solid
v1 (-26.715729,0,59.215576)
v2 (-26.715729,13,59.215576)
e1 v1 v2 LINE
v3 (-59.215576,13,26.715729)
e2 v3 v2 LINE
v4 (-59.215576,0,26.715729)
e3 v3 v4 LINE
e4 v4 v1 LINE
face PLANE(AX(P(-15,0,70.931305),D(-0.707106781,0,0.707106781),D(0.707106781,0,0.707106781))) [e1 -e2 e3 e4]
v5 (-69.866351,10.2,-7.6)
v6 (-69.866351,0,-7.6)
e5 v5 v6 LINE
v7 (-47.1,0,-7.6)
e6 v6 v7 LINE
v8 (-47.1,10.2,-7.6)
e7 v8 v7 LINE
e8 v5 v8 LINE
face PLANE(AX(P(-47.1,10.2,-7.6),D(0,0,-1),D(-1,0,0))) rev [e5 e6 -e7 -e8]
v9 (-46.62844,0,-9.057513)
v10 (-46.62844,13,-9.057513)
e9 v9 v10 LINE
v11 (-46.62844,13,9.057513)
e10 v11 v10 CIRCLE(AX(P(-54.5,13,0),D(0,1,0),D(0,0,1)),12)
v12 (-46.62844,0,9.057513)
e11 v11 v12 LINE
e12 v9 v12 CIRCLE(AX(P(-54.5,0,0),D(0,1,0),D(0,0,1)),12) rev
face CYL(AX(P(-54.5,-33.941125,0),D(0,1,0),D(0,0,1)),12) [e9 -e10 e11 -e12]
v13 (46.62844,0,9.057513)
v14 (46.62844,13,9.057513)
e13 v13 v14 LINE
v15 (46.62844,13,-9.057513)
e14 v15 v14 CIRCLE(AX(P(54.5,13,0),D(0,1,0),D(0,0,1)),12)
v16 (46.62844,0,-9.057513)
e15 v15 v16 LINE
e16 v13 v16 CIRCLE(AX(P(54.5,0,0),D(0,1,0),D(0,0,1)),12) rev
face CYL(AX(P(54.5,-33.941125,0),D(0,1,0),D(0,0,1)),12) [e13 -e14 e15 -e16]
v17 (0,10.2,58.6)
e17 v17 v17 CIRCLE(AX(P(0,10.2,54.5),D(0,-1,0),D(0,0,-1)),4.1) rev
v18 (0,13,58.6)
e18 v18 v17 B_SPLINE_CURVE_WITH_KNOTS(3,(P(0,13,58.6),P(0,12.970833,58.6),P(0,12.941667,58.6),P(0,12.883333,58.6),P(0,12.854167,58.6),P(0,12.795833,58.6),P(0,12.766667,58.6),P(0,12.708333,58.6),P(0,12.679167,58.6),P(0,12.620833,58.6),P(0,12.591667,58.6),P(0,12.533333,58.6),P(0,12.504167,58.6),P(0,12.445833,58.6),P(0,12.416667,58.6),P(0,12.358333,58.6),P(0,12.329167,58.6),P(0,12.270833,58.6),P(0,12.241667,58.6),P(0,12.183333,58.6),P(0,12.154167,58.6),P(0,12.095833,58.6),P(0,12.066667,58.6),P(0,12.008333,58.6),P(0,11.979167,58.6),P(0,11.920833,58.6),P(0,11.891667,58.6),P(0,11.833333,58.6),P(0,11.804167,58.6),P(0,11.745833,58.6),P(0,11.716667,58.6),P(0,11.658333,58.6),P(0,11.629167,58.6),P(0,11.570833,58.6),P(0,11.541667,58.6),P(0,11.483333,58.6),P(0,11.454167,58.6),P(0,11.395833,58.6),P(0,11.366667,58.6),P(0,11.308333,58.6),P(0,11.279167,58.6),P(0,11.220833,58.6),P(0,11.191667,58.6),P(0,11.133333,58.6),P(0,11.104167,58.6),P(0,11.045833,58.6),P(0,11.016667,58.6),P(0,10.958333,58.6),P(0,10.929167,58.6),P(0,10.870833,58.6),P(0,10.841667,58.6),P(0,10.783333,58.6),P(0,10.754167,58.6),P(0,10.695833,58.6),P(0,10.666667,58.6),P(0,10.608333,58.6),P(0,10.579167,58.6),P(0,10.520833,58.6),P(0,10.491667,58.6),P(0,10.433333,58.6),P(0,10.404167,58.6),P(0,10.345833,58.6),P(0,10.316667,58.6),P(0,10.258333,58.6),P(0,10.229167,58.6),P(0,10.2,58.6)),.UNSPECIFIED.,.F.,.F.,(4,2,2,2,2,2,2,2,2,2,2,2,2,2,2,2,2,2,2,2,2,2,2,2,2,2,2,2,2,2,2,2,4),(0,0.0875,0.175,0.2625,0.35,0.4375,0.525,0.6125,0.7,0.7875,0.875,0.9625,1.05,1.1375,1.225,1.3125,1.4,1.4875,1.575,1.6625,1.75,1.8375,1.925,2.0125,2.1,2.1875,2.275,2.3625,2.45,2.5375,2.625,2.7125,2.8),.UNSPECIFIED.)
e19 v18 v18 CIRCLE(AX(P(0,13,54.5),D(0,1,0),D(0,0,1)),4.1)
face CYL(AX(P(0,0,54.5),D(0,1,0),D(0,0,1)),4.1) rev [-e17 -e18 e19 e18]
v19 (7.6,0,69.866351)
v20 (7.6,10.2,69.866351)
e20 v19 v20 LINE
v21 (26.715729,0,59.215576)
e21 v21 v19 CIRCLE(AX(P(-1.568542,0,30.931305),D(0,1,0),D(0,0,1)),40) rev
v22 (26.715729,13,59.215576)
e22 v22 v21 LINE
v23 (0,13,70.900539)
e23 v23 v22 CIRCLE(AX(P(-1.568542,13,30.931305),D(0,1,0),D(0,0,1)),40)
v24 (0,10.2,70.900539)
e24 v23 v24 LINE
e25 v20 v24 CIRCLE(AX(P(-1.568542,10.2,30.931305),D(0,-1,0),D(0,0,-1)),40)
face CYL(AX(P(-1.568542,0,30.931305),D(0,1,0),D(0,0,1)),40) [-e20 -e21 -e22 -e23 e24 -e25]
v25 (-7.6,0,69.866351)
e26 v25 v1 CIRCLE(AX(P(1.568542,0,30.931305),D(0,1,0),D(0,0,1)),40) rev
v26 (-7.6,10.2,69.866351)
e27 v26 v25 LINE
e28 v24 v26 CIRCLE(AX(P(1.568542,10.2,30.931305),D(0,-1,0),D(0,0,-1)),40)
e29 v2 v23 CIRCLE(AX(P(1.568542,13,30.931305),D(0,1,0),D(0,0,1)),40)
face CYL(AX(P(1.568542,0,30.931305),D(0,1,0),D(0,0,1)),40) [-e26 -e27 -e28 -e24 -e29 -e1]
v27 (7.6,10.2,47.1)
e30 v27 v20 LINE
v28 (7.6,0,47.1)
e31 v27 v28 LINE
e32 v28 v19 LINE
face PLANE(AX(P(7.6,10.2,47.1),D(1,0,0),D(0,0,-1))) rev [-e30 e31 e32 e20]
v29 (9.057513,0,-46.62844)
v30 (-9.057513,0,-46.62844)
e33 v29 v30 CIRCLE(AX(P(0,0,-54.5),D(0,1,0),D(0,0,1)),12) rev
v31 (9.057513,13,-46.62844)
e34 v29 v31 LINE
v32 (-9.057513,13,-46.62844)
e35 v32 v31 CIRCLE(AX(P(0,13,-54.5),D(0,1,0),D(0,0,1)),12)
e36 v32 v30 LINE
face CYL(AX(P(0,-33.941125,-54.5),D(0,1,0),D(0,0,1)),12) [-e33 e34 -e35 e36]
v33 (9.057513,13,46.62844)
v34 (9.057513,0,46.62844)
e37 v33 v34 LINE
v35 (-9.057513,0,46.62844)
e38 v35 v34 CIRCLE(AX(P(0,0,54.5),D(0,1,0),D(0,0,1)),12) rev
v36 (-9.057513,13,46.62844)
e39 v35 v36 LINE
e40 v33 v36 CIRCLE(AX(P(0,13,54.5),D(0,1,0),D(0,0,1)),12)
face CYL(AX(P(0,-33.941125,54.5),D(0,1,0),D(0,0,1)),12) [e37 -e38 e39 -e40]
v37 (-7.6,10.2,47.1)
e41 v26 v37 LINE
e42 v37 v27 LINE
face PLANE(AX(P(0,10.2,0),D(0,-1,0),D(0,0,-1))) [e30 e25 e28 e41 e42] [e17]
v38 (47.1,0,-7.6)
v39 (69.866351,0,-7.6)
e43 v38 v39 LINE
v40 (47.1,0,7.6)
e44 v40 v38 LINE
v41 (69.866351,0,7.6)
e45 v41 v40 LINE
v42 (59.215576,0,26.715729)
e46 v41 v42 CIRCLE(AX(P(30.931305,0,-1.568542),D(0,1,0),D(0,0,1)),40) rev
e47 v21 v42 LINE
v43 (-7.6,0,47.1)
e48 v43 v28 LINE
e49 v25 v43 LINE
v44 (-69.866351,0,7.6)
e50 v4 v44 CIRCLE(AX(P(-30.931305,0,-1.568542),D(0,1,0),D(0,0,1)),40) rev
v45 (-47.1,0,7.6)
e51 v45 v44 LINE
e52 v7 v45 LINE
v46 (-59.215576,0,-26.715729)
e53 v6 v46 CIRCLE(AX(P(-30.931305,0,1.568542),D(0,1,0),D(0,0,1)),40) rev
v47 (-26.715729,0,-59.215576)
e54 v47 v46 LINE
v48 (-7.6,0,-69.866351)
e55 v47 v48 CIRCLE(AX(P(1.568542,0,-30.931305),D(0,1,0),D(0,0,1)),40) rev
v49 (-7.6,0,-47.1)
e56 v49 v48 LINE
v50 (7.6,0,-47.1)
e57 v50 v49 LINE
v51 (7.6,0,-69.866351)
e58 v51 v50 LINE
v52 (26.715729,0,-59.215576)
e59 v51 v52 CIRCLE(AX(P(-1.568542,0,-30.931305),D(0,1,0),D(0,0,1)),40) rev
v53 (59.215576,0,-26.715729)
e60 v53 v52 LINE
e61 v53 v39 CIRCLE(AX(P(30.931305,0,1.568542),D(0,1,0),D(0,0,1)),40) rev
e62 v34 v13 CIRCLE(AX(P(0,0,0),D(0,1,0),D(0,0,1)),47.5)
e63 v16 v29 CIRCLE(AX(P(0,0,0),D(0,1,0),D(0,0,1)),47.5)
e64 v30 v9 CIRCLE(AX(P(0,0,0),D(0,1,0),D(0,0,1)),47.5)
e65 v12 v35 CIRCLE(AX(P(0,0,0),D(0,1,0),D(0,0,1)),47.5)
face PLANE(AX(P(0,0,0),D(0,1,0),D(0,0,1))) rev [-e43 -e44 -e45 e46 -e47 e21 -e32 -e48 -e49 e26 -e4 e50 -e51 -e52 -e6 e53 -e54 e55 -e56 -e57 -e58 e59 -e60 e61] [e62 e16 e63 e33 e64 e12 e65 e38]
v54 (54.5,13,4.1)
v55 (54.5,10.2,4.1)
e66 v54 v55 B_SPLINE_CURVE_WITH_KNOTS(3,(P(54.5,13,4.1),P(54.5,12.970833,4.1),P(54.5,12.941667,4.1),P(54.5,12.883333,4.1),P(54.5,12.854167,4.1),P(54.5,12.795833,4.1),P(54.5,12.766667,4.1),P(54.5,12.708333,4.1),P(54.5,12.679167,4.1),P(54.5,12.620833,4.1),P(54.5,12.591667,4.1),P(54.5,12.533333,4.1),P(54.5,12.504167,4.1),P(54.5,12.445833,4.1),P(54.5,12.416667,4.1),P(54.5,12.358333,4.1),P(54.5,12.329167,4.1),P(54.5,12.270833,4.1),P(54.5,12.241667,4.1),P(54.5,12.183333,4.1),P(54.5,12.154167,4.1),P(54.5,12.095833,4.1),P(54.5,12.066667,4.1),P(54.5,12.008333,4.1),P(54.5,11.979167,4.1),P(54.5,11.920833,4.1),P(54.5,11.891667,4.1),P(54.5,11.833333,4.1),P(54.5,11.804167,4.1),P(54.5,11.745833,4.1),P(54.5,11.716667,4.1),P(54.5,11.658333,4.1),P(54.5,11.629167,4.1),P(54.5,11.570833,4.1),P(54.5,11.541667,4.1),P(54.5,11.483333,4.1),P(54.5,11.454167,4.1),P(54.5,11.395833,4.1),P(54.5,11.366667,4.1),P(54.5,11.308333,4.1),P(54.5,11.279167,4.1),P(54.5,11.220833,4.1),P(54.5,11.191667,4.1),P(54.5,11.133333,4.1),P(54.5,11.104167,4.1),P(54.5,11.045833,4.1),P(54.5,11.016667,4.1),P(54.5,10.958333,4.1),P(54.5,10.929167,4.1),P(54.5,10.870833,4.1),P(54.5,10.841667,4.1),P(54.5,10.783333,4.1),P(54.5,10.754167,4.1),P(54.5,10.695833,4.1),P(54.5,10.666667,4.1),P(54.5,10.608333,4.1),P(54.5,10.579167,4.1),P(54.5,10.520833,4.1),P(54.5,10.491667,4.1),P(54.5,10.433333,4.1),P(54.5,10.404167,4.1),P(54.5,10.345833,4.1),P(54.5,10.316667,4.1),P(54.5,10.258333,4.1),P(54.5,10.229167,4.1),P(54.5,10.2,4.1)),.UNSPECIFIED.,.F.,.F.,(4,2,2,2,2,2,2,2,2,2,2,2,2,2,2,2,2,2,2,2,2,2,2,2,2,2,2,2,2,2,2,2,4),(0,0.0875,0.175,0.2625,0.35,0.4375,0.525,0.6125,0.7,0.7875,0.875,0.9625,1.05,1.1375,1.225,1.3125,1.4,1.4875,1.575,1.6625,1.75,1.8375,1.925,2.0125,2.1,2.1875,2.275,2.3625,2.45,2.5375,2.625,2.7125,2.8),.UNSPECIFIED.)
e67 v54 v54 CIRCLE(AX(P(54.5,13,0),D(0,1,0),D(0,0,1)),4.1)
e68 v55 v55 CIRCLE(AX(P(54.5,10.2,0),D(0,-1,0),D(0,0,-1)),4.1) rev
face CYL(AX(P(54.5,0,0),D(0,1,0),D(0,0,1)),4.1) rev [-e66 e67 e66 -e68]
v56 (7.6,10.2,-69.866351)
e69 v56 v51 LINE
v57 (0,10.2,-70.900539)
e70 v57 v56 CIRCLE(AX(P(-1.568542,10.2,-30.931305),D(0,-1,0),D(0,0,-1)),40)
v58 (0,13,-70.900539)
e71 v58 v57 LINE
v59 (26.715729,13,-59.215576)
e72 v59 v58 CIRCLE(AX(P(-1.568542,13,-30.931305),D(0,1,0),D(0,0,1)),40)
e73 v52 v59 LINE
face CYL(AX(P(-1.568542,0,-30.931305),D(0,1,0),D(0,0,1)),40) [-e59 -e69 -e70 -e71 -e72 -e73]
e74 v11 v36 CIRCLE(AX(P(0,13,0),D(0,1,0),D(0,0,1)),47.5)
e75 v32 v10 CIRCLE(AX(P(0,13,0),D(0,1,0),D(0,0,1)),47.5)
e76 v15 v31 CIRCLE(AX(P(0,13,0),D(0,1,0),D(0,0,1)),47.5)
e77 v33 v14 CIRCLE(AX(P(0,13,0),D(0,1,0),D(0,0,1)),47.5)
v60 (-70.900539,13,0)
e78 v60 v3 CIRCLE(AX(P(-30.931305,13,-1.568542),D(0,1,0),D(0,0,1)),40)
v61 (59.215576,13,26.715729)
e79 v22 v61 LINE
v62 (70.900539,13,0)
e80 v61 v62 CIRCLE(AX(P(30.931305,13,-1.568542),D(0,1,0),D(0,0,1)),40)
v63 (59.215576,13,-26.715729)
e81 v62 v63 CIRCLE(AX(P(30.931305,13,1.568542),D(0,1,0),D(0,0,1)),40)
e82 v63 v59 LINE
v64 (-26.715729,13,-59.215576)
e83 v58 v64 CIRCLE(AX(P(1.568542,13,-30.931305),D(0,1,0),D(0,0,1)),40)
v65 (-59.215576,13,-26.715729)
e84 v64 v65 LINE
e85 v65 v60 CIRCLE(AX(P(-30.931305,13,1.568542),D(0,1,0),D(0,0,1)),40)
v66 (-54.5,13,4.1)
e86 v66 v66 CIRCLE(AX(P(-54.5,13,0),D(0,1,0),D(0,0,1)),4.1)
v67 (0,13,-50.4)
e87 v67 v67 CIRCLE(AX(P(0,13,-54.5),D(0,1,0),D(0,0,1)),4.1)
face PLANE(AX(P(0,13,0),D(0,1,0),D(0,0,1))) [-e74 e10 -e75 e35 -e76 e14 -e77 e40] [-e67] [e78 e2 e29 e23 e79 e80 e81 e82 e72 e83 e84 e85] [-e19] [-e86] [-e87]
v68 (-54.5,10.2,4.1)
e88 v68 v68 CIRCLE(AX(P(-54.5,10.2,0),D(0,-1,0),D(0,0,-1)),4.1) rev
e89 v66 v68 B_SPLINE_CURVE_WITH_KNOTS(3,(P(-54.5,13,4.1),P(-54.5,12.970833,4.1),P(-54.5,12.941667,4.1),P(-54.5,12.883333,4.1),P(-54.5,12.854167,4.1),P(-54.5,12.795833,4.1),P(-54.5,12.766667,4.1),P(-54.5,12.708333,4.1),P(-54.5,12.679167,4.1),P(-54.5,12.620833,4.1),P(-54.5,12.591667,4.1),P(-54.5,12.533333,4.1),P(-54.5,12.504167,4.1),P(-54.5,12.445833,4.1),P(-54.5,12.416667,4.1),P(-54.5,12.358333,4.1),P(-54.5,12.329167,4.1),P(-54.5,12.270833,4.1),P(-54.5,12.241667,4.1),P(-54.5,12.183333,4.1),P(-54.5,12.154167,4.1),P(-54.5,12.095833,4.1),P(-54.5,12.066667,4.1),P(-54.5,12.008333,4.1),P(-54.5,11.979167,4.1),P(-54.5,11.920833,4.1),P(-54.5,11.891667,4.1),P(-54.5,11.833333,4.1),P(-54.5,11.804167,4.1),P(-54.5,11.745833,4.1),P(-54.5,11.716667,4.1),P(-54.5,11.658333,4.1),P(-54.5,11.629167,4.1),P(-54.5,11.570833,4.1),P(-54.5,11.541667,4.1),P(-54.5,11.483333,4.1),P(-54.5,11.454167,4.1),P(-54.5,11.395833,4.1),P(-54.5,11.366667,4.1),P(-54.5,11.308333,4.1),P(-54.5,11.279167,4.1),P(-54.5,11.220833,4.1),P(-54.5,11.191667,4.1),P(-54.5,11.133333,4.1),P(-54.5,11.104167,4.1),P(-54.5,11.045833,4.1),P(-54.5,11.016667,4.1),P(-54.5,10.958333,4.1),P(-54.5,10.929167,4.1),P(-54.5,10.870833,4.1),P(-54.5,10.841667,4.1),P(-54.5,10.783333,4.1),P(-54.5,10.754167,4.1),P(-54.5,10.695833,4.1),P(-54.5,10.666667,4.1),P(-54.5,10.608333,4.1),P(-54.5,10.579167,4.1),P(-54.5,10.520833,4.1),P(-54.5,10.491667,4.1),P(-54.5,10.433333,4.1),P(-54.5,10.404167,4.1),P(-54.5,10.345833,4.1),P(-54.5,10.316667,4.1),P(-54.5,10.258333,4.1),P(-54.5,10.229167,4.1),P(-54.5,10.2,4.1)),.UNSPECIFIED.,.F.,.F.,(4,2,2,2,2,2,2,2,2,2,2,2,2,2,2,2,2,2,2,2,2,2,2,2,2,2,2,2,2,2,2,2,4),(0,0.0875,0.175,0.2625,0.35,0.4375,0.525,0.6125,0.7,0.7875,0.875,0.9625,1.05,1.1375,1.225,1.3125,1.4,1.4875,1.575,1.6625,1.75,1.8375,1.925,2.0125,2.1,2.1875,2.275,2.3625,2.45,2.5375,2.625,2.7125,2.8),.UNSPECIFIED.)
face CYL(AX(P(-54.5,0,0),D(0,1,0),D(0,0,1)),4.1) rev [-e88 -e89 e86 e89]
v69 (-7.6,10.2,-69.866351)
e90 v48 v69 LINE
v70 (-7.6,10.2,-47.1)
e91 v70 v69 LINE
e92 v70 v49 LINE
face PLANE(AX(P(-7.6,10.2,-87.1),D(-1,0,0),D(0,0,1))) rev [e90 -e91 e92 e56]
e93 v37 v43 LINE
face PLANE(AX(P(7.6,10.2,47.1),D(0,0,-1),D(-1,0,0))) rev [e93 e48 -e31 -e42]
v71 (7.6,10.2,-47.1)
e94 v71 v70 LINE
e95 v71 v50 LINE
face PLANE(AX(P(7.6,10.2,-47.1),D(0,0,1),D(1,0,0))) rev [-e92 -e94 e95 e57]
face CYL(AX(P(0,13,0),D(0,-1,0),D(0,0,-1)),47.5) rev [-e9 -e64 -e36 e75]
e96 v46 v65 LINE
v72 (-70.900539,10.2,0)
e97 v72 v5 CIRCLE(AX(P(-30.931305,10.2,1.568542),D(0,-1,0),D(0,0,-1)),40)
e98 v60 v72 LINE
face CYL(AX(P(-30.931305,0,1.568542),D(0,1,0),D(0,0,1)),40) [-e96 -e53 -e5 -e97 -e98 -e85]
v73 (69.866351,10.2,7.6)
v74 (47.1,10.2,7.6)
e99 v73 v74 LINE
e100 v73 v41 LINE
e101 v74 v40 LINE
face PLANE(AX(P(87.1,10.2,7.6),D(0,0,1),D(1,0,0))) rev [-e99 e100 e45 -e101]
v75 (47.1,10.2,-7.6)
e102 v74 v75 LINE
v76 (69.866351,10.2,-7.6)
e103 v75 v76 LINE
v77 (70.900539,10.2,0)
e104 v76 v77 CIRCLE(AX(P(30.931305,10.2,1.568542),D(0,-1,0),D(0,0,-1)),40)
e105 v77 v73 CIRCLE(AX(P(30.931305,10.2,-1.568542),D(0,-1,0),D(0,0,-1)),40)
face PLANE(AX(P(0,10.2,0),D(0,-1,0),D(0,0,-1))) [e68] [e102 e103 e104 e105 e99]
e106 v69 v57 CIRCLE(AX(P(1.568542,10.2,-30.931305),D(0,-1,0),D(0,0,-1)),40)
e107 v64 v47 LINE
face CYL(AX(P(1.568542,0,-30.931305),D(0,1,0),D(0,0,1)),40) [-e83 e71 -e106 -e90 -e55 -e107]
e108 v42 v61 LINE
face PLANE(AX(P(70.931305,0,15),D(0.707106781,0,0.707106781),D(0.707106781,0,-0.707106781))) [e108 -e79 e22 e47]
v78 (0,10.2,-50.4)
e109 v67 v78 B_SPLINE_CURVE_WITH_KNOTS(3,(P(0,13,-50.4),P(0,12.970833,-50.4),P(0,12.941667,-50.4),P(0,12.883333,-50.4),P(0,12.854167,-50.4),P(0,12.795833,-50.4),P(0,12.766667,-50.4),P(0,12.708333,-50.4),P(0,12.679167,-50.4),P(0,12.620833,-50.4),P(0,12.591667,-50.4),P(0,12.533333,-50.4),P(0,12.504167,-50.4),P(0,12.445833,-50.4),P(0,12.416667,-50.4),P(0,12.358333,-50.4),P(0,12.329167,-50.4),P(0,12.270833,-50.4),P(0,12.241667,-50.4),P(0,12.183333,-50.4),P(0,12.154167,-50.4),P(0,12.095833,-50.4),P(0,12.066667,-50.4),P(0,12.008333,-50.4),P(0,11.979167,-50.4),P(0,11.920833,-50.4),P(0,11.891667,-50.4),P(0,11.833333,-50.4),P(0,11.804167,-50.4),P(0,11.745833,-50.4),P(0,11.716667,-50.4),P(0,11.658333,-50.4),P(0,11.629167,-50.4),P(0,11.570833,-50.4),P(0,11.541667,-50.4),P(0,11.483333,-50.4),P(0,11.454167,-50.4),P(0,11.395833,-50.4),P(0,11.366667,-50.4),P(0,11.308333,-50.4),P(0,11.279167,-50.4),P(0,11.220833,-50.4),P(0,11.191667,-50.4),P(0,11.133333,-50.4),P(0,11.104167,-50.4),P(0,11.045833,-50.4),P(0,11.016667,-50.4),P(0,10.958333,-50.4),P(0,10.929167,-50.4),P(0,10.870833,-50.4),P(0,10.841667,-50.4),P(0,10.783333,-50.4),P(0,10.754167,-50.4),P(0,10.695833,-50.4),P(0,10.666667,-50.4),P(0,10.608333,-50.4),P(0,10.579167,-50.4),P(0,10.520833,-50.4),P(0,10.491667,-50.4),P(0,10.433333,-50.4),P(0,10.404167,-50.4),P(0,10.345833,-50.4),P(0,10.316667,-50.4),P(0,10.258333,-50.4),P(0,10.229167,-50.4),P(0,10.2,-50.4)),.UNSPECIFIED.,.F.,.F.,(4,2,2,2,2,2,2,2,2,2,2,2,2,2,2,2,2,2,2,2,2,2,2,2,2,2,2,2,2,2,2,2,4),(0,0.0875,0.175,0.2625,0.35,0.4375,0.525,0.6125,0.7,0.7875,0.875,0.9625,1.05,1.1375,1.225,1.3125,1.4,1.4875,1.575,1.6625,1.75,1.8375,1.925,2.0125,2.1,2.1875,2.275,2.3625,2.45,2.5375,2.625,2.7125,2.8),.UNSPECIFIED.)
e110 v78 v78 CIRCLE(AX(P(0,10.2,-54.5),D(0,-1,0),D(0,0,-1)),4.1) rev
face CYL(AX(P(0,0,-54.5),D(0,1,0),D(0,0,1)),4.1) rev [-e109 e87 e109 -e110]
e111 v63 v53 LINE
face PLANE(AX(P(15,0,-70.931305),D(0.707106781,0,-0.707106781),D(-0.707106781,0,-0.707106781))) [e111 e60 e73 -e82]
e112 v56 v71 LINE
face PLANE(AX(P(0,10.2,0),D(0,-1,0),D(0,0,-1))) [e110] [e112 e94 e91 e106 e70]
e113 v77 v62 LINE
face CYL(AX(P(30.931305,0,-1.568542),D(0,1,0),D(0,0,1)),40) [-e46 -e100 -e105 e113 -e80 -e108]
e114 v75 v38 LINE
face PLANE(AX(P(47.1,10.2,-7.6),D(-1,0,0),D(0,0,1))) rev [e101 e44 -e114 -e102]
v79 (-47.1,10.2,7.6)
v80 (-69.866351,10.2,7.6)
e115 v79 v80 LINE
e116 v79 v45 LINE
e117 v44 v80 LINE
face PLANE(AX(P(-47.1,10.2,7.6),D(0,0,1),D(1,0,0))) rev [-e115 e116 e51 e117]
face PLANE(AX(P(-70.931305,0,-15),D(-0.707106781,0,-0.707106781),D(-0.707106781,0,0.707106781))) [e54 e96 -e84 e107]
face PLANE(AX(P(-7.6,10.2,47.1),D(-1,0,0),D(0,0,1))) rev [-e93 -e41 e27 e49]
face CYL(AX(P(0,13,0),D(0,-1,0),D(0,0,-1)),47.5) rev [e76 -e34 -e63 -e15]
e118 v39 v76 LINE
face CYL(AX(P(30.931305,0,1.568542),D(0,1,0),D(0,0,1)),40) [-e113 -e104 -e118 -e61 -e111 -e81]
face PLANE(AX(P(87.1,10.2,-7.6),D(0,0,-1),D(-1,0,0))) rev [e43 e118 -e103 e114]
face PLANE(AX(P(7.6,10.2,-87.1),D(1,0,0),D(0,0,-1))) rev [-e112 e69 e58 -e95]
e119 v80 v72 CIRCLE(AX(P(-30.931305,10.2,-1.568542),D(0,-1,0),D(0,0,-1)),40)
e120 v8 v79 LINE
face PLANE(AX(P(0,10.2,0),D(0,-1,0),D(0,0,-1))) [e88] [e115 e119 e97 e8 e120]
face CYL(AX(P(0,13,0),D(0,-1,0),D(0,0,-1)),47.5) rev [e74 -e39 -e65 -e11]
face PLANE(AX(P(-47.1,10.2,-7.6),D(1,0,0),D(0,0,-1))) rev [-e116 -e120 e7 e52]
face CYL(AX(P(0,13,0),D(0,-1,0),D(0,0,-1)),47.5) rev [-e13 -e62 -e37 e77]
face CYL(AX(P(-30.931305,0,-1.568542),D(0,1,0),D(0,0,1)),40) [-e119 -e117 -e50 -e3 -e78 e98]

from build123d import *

# Parameters (mm, degrees)
SKETCH1_R           = 72.5
SKETCH1_R_2         = 47.5
BOSS_EXTRUDE1_DEPTH = 13
SKETCH2_R           = 4.1
CUT_EXTRUDE1_DEPTH  = 104.351342517
SKETCH8_R           = 12
SKETCH8_R_2         = 4.1
BOSS_EXTRUDE4_DEPTH = 13
SKETCH3_W           = 15.2
SKETCH3_H           = 40
SKETCH3_W_2         = 40
SKETCH3_H_2         = 15.2
CUT_EXTRUDE2_DEPTH  = 10.2
BOSS_EXTRUDE2_DEPTH = 13
FILLET1_R           = 30
SKETCH7_OUTSIDE_W   = 188.094
SKETCH7_OUTSIDE_H   = 188.094
CUT_EXTRUDE4_DEPTH  = 104.351342517
FILLET3_R           = 40


with BuildPart() as part:
    # Sketch1 → Boss-Extrude1 (new body)
    with BuildSketch(Plane(origin=(0, 0, 0), x_dir=(1, 0, 0), z_dir=(0, 1, 0))):
        with Locations(Location((0, 0, 0), (0, 0, 90))):
            Circle(SKETCH1_R)
        with Locations(Location((0, 0, 0), (0, 0, 90))):
            Circle(SKETCH1_R_2, mode=Mode.SUBTRACT)
    extrude(amount=BOSS_EXTRUDE1_DEPTH)

    # Sketch2 → Cut-Extrude1 (cut, through all)
    with BuildSketch(Plane(origin=(0, 13, 0), x_dir=(1, 0, 0), z_dir=(0, 1, 0))):
        with Locations(Location((0, 54.5, 0), (0, 0, 270))):
            Circle(SKETCH2_R)
        with Locations(Location((54.5, 0, 0), (0, 0, 270))):
            Circle(SKETCH2_R)
        with Locations(Location((0, -54.5, 0), (0, 0, 270))):
            Circle(SKETCH2_R)
        with Locations(Location((-54.5, 0, 0), (0, 0, 270))):
            Circle(SKETCH2_R)
    extrude(amount=-CUT_EXTRUDE1_DEPTH, mode=Mode.SUBTRACT)

    # Sketch8 → Boss-Extrude4 (add)
    # profile 1 of 4: a face of its own
    with BuildSketch(Plane(origin=(0, 13, 0), x_dir=(1, 0, 0), z_dir=(0, 1, 0))):
        with Locations((54.5, 0)):
            Circle(SKETCH8_R)
        with Locations(Location((54.5, 0, 0), (0, 0, 270))):
            Circle(SKETCH8_R_2, mode=Mode.SUBTRACT)
    # profile 2 of 4: a face of its own
    with BuildSketch(Plane(origin=(0, 13, 0), x_dir=(1, 0, 0), z_dir=(0, 1, 0))):
        with Locations((0, -54.5)):
            Circle(SKETCH8_R)
        with Locations(Location((0, -54.5, 0), (0, 0, 270))):
            Circle(SKETCH8_R_2, mode=Mode.SUBTRACT)
    # profile 3 of 4: a face of its own
    with BuildSketch(Plane(origin=(0, 13, 0), x_dir=(1, 0, 0), z_dir=(0, 1, 0))):
        with Locations((-54.5, 0)):
            Circle(SKETCH8_R)
        with Locations(Location((-54.5, 0, 0), (0, 0, 270))):
            Circle(SKETCH8_R_2, mode=Mode.SUBTRACT)
    # profile 4 of 4: a face of its own
    with BuildSketch(Plane(origin=(0, 13, 0), x_dir=(1, 0, 0), z_dir=(0, 1, 0))):
        with Locations((0, 54.5)):
            Circle(SKETCH8_R)
        with Locations(Location((0, 54.5, 0), (0, 0, 270))):
            Circle(SKETCH8_R_2, mode=Mode.SUBTRACT)
    extrude(amount=-BOSS_EXTRUDE4_DEPTH)

    # Sketch3 → Cut-Extrude2 (cut)
    with BuildSketch(Plane.XZ):
        with Locations((0, 67.1)):
            Rectangle(SKETCH3_W, SKETCH3_H)
        with Locations((67.1, 0)):
            Rectangle(SKETCH3_W_2, SKETCH3_H_2)
        with Locations((0, -67.1)):
            Rectangle(SKETCH3_W, SKETCH3_H)
        with Locations((-67.1, 0)):
            Rectangle(SKETCH3_W_2, SKETCH3_H_2)
    extrude(amount=-CUT_EXTRUDE2_DEPTH, mode=Mode.SUBTRACT)

    # Sketch4 → Boss-Extrude2 (add)
    with BuildSketch(Plane(origin=(0, 13, 0), x_dir=(1, 0, 0), z_dir=(0, 1, 0))):
        Polygon((-38.890872965, -63.639610307), (-63.639610307, -38.890872965), (-62.123740526, -37.375003185), (-37.375003185, -62.123740526), align=None)
    extrude(amount=-BOSS_EXTRUDE2_DEPTH)

    # Fillet1
    # the kernel refuses this fillet: 30 mm, written as the material it adds along each edge
    with BuildSketch(Plane(origin=(-62.123740526, 13, 37.375003185), x_dir=(-0.46376459281913895, 0, -0.8859584654188357), z_dir=(0, -1, 0))) as fillet1_piece_1:
        with BuildLine():
            CenterArc((10.383918848, -29.947140809), FILLET1_R, 93.401739444, 18.157539937)
            Line((-0.639990933, -2.046004396), (-0.860469129, -1.487981668))
            ThreePointArc((-0.860469129, -1.487981668), (-0.892634463, -0.843880508), (-0.572638996, 0.17912169))
            Line((-0.572638996, 0.17912169), (0.035602007, 0.598942816))
            ThreePointArc((0.035602007, 0.598942816), (4.301909237, 0.472256956), (8.568216466, 0.598942816))
            Line((8.568216466, 0.598942816), (8.603818474, 0))
        make_face()
    extrude(amount=13)
    with BuildSketch(Plane(origin=(-37.375003185, 13, 62.123740526), x_dir=(0.8859584654188359, 0, 0.4637645928191383), z_dir=(0, -1, 0))) as fillet1_piece_2:
        with BuildLine():
            CenterArc((10.383918848, 29.947140809), FILLET1_R, 248.440720619, 18.157539937)
            Line((-0.639990933, 2.046004396), (-0.860469129, 1.487981668))
            ThreePointArc((-0.860469129, 1.487981668), (-0.892634463, 0.843880508), (-0.572638996, -0.17912169))
            Line((-0.572638996, -0.17912169), (0.035602007, -0.598942816))
            ThreePointArc((0.035602007, -0.598942816), (4.301909237, -0.472256956), (8.568216466, -0.598942816))
            Line((8.568216466, -0.598942816), (8.603818474, 0))
        make_face()
    extrude(amount=13)

    # Sketch7 outside → Cut-Extrude4 (cut, through all)
    with BuildSketch(Plane(origin=(0, 13, 0), x_dir=(1, 0, 0), z_dir=(0, 1, 0))):
        Rectangle(SKETCH7_OUTSIDE_W, SKETCH7_OUTSIDE_H)
        Polygon((70.931304796, -15), (15, -70.931304796), (-15, -70.931304796), (-70.931304796, -15), (-70.931304796, 15), (-15, 70.931304796), (15, 70.931304796), (70.931304796, 15), align=None, mode=Mode.SUBTRACT)
    extrude(amount=-CUT_EXTRUDE4_DEPTH, mode=Mode.SUBTRACT)

    # Fillet3
    # the kernel refuses this fillet: 40 mm, written as the material it takes off along each edge
    with BuildSketch(Plane(origin=(15, 54.421356237, 70.931304796), x_dir=(-1, 0, 0), z_dir=(0, -1, 0)), Plane(origin=(70.931304796, 54.421356237, 15), x_dir=(-0.7071067811865474, 0, 0.7071067811865476), z_dir=(0, -1, 0))) as fillet3_piece_1:
        with BuildLine():
            CenterArc((FILLET3_R * 0.414213562373, FILLET3_R), FILLET3_R, 225, 45)
            Line((-FILLET3_R * 0.292893218813, FILLET3_R * 0.292893218813), (0, 0))
            Line((0, 0), (FILLET3_R * 0.414213562373, 0))
        make_face()
    extrude(amount=95.842712475, mode=Mode.SUBTRACT)
    with BuildSketch(Plane(origin=(-15, 54.421356237, 70.931304796), x_dir=(1, 0, 0), z_dir=(0, -1, 0)), Plane(origin=(-70.931304796, 54.421356237, 15), x_dir=(0.7071067811865476, 0, 0.7071067811865476), z_dir=(0, -1, 0)), Plane(origin=(-70.931304796, 54.421356237, -15), x_dir=(0, 0, 1), z_dir=(0, -1, 0)), Plane(origin=(-15, 54.421356237, -70.931304796), x_dir=(-0.7071067811865476, 0, 0.7071067811865476), z_dir=(0, -1, 0)), Plane(origin=(15, 54.421356237, -70.931304796), x_dir=(-1, 0, 0), z_dir=(0, -1, 0)), Plane(origin=(70.931304796, 54.421356237, -15), x_dir=(-0.7071067811865476, 0, -0.7071067811865476), z_dir=(0, -1, 0))) as fillet3_piece_2:
        with BuildLine():
            CenterArc((FILLET3_R * 0.414213562373, -FILLET3_R), FILLET3_R, 90, 45)
            Line((-FILLET3_R * 0.292893218813, -FILLET3_R * 0.292893218813), (0, 0))
            Line((0, 0), (FILLET3_R * 0.414213562373, 0))
        make_face()
    extrude(amount=95.842712475, mode=Mode.SUBTRACT)


solid = part.part
